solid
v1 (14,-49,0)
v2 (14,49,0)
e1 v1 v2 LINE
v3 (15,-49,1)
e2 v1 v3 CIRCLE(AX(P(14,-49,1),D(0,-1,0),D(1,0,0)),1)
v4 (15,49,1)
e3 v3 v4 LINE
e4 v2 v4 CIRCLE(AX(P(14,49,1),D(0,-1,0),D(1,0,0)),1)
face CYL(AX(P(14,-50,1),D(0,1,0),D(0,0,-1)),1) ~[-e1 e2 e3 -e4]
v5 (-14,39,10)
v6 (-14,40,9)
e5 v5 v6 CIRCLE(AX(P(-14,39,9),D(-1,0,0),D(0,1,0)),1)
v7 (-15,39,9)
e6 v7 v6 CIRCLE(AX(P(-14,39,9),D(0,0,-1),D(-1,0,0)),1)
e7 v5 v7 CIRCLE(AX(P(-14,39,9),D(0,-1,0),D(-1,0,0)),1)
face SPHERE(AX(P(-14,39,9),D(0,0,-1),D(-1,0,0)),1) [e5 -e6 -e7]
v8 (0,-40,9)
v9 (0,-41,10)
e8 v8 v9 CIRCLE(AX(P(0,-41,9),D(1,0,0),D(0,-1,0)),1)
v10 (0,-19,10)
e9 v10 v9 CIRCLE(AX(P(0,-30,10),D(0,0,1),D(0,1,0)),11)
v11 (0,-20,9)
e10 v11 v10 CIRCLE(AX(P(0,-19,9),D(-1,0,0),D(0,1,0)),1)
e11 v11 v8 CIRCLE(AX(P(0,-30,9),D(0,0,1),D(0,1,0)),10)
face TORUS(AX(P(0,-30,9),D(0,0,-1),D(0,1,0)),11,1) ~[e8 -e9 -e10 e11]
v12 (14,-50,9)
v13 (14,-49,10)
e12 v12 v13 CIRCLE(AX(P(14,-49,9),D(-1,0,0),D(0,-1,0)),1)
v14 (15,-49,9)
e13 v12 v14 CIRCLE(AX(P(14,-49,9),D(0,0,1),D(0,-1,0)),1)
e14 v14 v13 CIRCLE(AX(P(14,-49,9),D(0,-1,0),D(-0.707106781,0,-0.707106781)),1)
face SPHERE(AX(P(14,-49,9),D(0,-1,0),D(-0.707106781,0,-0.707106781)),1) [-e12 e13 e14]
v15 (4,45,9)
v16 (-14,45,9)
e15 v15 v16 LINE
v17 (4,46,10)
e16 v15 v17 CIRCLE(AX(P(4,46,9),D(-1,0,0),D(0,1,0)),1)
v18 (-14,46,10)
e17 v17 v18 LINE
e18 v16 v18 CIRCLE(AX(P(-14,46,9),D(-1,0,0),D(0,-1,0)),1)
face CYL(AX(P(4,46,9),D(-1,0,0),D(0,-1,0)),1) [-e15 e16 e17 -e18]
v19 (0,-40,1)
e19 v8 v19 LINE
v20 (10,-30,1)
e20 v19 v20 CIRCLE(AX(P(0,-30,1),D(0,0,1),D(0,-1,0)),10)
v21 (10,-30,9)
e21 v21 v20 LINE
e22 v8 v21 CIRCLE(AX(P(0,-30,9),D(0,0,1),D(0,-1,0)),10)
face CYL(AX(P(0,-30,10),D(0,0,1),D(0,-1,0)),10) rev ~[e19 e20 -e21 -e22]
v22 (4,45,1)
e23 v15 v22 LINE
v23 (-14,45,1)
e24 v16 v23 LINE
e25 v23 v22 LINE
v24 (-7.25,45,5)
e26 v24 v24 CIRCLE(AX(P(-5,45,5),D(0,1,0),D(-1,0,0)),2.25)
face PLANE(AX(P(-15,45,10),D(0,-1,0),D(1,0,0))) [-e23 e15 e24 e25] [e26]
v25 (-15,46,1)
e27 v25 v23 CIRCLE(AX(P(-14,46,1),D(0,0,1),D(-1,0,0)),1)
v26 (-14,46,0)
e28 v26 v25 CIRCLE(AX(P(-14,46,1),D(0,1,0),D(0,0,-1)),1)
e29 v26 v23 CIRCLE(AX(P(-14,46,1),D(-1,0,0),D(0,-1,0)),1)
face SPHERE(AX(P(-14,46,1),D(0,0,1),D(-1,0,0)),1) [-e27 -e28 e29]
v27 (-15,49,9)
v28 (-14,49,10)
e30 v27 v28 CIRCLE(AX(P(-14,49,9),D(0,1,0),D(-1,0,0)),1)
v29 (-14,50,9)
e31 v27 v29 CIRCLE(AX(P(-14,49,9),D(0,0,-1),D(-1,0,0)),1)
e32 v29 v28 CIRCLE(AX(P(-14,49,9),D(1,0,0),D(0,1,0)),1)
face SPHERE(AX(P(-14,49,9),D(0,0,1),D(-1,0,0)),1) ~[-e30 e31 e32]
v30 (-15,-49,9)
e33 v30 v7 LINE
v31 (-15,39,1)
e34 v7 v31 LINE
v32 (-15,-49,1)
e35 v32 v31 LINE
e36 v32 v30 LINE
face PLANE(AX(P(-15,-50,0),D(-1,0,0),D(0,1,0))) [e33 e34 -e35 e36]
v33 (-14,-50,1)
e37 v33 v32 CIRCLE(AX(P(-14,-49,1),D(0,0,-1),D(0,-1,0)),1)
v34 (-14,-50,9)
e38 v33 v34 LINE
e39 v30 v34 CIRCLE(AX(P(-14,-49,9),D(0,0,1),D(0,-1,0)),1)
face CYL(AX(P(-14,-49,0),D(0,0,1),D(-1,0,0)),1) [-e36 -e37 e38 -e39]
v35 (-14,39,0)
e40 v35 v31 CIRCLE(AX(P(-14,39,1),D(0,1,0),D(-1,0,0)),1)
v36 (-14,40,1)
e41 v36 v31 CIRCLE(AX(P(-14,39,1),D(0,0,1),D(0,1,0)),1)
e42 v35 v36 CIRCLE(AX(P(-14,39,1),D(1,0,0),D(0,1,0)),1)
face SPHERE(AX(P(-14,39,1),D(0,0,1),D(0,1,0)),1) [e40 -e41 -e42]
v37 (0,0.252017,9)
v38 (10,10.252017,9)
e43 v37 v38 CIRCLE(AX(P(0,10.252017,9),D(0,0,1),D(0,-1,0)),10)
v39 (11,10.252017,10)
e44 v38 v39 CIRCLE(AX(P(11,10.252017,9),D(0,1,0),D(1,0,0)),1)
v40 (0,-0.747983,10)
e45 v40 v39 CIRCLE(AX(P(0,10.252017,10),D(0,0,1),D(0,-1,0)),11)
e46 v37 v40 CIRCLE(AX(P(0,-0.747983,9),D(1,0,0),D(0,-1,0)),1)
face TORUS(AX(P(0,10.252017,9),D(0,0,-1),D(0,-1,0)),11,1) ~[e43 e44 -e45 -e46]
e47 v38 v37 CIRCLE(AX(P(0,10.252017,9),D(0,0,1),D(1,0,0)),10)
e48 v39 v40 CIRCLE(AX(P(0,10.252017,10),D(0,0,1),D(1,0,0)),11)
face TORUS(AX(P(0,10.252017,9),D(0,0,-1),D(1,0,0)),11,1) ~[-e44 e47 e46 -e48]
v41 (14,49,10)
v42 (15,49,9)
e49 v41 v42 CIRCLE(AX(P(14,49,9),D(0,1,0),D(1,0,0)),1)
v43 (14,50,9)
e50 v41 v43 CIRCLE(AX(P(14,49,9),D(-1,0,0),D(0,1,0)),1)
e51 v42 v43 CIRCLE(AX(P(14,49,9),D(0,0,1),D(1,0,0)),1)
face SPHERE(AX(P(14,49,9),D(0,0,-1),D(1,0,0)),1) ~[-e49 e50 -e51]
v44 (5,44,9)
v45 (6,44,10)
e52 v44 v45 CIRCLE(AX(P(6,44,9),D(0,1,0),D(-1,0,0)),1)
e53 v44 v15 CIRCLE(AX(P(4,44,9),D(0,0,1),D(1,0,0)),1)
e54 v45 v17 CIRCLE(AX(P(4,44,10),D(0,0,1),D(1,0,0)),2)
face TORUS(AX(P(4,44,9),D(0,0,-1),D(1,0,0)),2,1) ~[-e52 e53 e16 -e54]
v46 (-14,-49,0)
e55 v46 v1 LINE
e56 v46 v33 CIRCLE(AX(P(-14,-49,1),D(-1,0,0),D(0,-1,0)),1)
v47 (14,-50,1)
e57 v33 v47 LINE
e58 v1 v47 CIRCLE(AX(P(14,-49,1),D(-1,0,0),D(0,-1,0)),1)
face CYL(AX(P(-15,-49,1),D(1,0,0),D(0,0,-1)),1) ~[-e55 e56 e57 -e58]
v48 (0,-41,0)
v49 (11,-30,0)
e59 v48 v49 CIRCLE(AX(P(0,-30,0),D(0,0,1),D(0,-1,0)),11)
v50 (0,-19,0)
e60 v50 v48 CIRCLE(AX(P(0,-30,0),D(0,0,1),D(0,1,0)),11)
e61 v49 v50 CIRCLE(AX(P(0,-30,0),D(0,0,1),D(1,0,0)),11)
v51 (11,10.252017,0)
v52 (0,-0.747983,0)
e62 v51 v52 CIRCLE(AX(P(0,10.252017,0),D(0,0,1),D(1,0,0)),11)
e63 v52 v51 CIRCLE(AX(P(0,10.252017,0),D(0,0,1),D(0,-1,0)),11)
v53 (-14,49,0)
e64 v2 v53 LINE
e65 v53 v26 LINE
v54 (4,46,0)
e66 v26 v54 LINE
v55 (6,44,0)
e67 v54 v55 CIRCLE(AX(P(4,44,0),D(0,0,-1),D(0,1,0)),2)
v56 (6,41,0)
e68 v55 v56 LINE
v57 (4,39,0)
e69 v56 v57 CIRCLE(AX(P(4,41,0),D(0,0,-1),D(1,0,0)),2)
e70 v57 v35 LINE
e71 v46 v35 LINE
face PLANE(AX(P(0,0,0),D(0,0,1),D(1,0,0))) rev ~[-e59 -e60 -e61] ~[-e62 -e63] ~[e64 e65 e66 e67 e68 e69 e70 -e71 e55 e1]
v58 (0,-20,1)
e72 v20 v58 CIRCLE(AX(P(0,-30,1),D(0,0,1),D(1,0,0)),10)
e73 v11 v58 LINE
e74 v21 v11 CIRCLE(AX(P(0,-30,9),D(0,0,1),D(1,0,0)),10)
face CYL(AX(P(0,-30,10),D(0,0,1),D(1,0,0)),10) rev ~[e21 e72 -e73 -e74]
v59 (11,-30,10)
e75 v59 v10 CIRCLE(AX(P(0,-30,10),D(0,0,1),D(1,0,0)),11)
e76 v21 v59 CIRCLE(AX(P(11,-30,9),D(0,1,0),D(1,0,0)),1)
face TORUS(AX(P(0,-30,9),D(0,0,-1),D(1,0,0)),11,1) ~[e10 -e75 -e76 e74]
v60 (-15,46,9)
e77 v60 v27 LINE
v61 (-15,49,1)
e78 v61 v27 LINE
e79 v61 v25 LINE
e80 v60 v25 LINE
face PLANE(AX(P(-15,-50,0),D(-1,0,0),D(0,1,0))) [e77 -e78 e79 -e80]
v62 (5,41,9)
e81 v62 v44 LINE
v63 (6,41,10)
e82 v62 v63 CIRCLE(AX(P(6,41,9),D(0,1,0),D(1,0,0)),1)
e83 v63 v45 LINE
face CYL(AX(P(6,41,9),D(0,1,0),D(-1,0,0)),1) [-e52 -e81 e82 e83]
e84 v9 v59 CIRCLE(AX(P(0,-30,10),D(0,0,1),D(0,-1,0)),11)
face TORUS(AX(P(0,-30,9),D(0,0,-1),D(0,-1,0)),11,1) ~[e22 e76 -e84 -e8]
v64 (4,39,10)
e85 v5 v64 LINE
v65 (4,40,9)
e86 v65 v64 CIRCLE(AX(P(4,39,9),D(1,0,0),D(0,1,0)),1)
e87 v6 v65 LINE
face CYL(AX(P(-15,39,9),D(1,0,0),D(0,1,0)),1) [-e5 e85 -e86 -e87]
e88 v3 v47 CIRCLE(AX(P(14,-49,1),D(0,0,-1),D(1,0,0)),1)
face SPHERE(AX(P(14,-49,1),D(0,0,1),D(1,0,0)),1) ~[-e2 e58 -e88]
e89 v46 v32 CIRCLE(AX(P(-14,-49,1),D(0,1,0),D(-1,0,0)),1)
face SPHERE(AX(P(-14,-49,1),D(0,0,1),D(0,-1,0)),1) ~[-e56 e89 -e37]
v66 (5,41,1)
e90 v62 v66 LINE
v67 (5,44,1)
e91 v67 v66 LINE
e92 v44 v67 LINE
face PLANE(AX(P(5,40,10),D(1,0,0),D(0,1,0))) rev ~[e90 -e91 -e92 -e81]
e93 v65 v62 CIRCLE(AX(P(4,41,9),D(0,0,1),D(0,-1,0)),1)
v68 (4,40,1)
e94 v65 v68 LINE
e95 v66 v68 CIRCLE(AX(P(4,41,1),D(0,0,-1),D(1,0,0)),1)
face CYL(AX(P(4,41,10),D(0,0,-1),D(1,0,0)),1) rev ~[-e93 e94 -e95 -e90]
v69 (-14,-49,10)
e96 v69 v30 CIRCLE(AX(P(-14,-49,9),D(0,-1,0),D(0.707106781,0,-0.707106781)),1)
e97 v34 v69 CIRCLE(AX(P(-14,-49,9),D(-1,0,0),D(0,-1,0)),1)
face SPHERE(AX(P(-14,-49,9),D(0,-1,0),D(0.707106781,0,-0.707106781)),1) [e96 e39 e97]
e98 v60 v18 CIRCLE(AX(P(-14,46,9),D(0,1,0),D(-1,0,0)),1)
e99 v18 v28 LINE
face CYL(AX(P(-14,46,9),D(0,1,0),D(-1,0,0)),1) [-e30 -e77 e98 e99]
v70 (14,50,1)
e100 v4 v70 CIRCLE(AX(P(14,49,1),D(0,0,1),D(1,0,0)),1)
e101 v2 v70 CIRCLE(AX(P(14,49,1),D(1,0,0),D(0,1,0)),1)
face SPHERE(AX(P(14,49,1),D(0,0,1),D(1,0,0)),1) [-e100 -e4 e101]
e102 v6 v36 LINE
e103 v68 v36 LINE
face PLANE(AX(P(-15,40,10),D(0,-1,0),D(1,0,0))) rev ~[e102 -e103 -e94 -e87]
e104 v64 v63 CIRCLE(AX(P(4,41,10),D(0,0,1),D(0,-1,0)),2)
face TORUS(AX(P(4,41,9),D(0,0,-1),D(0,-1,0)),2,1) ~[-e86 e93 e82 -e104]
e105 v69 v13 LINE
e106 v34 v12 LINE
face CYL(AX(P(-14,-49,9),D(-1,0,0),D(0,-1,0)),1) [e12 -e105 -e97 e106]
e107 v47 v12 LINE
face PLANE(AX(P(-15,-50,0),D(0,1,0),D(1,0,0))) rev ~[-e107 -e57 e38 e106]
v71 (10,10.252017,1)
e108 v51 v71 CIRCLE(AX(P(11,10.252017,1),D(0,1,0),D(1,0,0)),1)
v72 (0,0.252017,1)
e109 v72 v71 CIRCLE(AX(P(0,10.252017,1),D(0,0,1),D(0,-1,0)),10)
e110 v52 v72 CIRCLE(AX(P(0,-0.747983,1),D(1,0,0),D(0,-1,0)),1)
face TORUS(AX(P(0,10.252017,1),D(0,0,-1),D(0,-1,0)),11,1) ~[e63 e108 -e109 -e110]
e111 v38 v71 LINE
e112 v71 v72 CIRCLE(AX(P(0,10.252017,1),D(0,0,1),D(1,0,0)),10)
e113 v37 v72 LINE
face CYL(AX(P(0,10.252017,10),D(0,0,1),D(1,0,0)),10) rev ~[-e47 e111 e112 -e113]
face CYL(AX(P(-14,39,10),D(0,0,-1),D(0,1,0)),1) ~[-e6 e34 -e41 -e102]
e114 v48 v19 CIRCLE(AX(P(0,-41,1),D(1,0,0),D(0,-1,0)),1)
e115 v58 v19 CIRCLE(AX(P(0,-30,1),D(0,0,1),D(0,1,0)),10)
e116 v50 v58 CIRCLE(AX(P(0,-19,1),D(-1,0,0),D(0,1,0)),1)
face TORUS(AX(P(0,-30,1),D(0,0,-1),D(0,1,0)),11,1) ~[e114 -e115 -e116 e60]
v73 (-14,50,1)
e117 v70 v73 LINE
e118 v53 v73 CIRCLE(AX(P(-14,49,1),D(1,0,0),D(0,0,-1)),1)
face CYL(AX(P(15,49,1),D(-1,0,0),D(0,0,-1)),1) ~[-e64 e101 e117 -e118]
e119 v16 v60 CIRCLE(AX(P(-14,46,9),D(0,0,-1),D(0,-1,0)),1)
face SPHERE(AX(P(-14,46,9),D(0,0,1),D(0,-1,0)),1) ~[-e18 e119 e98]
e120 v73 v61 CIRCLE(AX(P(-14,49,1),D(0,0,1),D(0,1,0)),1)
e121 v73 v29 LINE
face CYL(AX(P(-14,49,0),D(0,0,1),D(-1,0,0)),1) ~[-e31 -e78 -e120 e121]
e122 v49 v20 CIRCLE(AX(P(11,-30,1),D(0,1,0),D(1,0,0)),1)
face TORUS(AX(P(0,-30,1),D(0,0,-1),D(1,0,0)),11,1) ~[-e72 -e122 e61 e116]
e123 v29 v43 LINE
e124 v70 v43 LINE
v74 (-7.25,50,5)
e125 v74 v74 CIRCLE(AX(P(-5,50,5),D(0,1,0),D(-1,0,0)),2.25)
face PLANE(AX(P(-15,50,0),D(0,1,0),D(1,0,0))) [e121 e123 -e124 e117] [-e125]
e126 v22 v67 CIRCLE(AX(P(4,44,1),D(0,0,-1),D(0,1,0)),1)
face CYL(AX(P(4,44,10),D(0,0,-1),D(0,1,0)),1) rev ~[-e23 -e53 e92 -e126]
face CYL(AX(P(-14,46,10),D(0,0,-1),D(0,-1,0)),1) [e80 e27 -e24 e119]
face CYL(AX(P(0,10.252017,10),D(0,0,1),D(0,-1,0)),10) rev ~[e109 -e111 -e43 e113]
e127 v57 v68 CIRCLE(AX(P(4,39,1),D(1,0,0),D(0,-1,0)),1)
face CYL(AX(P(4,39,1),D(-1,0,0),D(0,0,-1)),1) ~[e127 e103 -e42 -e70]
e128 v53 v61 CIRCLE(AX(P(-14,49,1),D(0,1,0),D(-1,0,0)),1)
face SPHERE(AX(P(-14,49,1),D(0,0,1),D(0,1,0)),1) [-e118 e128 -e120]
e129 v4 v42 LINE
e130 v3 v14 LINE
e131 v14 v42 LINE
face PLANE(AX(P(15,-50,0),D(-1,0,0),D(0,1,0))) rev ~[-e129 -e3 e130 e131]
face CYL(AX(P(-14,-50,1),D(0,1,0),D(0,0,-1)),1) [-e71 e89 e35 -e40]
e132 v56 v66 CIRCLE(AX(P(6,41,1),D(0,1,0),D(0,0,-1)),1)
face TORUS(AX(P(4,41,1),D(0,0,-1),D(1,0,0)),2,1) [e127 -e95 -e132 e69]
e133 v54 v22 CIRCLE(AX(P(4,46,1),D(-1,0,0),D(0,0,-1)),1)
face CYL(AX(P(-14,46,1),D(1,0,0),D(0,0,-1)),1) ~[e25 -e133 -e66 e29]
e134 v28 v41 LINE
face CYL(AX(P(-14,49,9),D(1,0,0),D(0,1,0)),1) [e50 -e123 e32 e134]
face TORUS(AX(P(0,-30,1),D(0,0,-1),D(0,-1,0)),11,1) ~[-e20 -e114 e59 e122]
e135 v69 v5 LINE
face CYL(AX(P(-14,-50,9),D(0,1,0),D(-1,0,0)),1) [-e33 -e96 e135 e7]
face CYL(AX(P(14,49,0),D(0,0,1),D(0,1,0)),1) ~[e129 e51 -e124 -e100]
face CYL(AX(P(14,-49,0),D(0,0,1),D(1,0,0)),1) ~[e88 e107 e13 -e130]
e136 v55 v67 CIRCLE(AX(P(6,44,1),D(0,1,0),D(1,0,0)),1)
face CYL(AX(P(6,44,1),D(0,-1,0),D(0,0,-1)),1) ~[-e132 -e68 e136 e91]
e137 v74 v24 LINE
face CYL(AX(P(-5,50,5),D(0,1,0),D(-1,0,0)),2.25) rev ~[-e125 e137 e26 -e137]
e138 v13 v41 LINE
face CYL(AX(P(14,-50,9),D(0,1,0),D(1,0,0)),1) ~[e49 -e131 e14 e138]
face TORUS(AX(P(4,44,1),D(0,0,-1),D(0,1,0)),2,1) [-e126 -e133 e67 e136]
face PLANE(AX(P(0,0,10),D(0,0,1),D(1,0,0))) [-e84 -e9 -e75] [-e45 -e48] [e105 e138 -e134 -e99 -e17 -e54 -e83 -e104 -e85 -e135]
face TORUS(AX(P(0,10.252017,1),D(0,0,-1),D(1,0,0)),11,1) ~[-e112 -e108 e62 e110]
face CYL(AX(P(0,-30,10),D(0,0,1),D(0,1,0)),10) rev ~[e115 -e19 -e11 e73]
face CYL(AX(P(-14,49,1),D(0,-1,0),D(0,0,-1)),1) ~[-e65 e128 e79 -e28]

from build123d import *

# Parameters (mm, degrees)
F0_W         = 30
F0_H         = 100
F1_DEPTH     = 10
F2_W         = 20
F2_H         = 5
F3_DEPTH     = 25
F4_R         = 2.25
F5_DEPTH     = 6
F6_R         = 1
F7_F1_R      = 1
F7_F2_R      = 1
F8_T1_DEPTH  = 28
F8_S5_W      = 1
F8_S5_H      = 1
F8_T6_DEPTH  = 1
F8_S11_W     = 1
F8_S11_H     = 1
F8_T12_DEPTH = 1
F10_DEPTH    = 25
F11_R        = 1
F12_R        = 1


# Not quite as in the source:
# - a fillet or chamfer that OpenCascade refuses, or shapes differently, is made with other operations: its cross-section is extruded or revolved along the edge and cut away or added


with BuildPart() as f1:
    # F0 (on Top) → F1 (new body)
    with BuildSketch(Plane.XY):
        Rectangle(F0_W, F0_H)
    extrude(amount=F1_DEPTH)

    # F2 (on face) → F3 (cut)
    with BuildSketch(Plane.XY.offset(10)):
        with Locations((-5, 42.5)):
            Rectangle(F2_W, F2_H)
    extrude(amount=-F3_DEPTH, mode=Mode.SUBTRACT)

    # F4 (on face) → F5 (cut)
    with BuildSketch(Plane(origin=(0, 50, 0), x_dir=(-1, 0, 0), z_dir=(0, 1, 0))):
        with Locations((5, 5)):
            Circle(F4_R)
    extrude(amount=-F5_DEPTH, mode=Mode.SUBTRACT)

    # F6
    f6_edges = [f1.edges().sort_by_distance(p)[0] for p in [
        (-15, 45, 5),
        (-15, 50, 5),
    ]]
    fillet(f6_edges, radius=F6_R)

    # F7: fillet of radius 1 on 19 edges, made by hand

    # F7_f1
    f7_f1_edges = [f1.edges().sort_by_distance(p)[0] for p in [
        (5, 40, 5),
        (5, 45, 5),
    ]]
    fillet(f7_f1_edges, radius=F7_F1_R)

    # F7_f2
    f7_f2_edges = [f1.edges().sort_by_distance(p)[0] for p in [
        (-15, 40, 5),
        (15, 50, 5),
        (15, -50, 5),
        (-15, -50, 5),
        (-15, -5, 10),
        (15, 0, 10),
        (15, 0, 0),
        (0, -50, 0),
        (-5, 45, 0),
        (-14.7071067812, 45.2928932188, 0),
        (5, 42.5, 0),
        (-15, 47.5, 0),
        (-5.5, 40, 0),
        (-14.7071067812, 49.7071067812, 0),
        (-15, -5, 0),
        (0.5, 50, 0),
        (0.5, 50, 10),
        (-14.7071067812, 49.7071067812, 10),
        (-15, 47.5, 10),
        (-14.7071067812, 45.2928932188, 10),
        (-5, 45, 10),
        (4.7071067812, 44.7071067812, 10),
        (4.7071067812, 40.2928932188, 0),
        (4.7071067812, 44.7071067812, 0),
    ]]
    fillet(f7_f2_edges, radius=F7_F2_R)

    # F8: fillet of radius 1 on 1 edges, made by hand

    # F8_s2 → F8_t1 (cut)
    with BuildSketch(Plane.YZ.offset(-14)):
        with BuildLine():
            ThreePointArc((-50, 9), (-49.7071067812, 9.7071067812), (-49, 10))
            Line((-49, 10), (-50, 10))
            Line((-50, 10), (-50, 9))
        make_face()
    extrude(amount=F8_T1_DEPTH, mode=Mode.SUBTRACT)


with BuildPart() as f8_tool4:
    # F8_s5 → F8_t6 (new body)
    with BuildSketch(Plane.XZ.offset(49)):
        with Locations((-14.5, 9.5)):
            Rectangle(F8_S5_W, F8_S5_H)
    extrude(amount=F8_T6_DEPTH)

    # F8_s7 → F8_t8 (revolve, cut)
    with BuildSketch(Plane(origin=(-14, -49, 9), x_dir=(0.7071067812, 0, -0.7071067812), z_dir=(-0.7071067812, 0, -0.7071067812))):
        with BuildLine():
            ThreePointArc((0, -1), (1, 0), (0, 1))
            Line((0, 1), (0, -1))
        make_face()
    revolve(axis=Axis((-14, -49, 9), (0, -1, 0)), mode=Mode.SUBTRACT)


with BuildPart() as f1_1:
    add(f1.part)

    # F8_t3: cut F8_tool4
    add(f8_tool4.part, mode=Mode.SUBTRACT)


with BuildPart() as f8_tool10:
    # F8_s11 → F8_t12 (new body)
    with BuildSketch(Plane.XZ.offset(49)):
        with Locations((14.5, 9.5)):
            Rectangle(F8_S11_W, F8_S11_H)
    extrude(amount=F8_T12_DEPTH)

    # F8_s13 → F8_t14 (revolve, cut)
    with BuildSketch(Plane(origin=(14, -49, 9), x_dir=(-0.7071067812, 0, -0.7071067812), z_dir=(-0.7071067812, 0, 0.7071067812))):
        with BuildLine():
            ThreePointArc((0, -1), (1, 0), (0, 1))
            Line((0, 1), (0, -1))
        make_face()
    revolve(axis=Axis((14, -49, 9), (0, -1, 0)), mode=Mode.SUBTRACT)


with BuildPart() as f1_2:
    add(f1_1.part)

    # F8_t9: cut F8_tool10
    add(f8_tool10.part, mode=Mode.SUBTRACT)

    # F9 (on face) → F10 (cut)
    with BuildSketch(Plane.XY.offset(10)):
        with BuildLine():
            ThreePointArc((0, -20), (-10, -30), (0, -40))
            Line((0, -40), (0, -30))
            Line((0, -30), (0, -20))
        make_face()
        with BuildLine():
            ThreePointArc((10, 10.2520165965), (-7.0710678119, 17.3230844084), (0, 0.2520165965))
            ThreePointArc((0, 0.2520165965), (7.0710678119, 3.1809487846), (10, 10.2520165965))
        make_face()
        with BuildLine():
            Line((0, -30), (0, -40))
            ThreePointArc((0, -40), (7.0710678119, -37.0710678119), (10, -30))
            ThreePointArc((10, -30), (7.0710678119, -22.9289321881), (0, -20))
            Line((0, -20), (0, -30))
        make_face()
    extrude(amount=-F10_DEPTH, mode=Mode.SUBTRACT)

    # F11
    f11_edges = [f1_2.edges().sort_by_distance(p)[0] for p in [
        (0, -20, 0),
    ]]
    fillet(f11_edges, radius=F11_R)

    # F12
    f12_edges = [f1_2.edges().sort_by_distance(p)[0] for p in [
        (0, -20, 10),
        (0, 20.252017, 10),
        (0, 20.252017, 0),
    ]]
    fillet(f12_edges, radius=F12_R)


solid = f1_2.part
